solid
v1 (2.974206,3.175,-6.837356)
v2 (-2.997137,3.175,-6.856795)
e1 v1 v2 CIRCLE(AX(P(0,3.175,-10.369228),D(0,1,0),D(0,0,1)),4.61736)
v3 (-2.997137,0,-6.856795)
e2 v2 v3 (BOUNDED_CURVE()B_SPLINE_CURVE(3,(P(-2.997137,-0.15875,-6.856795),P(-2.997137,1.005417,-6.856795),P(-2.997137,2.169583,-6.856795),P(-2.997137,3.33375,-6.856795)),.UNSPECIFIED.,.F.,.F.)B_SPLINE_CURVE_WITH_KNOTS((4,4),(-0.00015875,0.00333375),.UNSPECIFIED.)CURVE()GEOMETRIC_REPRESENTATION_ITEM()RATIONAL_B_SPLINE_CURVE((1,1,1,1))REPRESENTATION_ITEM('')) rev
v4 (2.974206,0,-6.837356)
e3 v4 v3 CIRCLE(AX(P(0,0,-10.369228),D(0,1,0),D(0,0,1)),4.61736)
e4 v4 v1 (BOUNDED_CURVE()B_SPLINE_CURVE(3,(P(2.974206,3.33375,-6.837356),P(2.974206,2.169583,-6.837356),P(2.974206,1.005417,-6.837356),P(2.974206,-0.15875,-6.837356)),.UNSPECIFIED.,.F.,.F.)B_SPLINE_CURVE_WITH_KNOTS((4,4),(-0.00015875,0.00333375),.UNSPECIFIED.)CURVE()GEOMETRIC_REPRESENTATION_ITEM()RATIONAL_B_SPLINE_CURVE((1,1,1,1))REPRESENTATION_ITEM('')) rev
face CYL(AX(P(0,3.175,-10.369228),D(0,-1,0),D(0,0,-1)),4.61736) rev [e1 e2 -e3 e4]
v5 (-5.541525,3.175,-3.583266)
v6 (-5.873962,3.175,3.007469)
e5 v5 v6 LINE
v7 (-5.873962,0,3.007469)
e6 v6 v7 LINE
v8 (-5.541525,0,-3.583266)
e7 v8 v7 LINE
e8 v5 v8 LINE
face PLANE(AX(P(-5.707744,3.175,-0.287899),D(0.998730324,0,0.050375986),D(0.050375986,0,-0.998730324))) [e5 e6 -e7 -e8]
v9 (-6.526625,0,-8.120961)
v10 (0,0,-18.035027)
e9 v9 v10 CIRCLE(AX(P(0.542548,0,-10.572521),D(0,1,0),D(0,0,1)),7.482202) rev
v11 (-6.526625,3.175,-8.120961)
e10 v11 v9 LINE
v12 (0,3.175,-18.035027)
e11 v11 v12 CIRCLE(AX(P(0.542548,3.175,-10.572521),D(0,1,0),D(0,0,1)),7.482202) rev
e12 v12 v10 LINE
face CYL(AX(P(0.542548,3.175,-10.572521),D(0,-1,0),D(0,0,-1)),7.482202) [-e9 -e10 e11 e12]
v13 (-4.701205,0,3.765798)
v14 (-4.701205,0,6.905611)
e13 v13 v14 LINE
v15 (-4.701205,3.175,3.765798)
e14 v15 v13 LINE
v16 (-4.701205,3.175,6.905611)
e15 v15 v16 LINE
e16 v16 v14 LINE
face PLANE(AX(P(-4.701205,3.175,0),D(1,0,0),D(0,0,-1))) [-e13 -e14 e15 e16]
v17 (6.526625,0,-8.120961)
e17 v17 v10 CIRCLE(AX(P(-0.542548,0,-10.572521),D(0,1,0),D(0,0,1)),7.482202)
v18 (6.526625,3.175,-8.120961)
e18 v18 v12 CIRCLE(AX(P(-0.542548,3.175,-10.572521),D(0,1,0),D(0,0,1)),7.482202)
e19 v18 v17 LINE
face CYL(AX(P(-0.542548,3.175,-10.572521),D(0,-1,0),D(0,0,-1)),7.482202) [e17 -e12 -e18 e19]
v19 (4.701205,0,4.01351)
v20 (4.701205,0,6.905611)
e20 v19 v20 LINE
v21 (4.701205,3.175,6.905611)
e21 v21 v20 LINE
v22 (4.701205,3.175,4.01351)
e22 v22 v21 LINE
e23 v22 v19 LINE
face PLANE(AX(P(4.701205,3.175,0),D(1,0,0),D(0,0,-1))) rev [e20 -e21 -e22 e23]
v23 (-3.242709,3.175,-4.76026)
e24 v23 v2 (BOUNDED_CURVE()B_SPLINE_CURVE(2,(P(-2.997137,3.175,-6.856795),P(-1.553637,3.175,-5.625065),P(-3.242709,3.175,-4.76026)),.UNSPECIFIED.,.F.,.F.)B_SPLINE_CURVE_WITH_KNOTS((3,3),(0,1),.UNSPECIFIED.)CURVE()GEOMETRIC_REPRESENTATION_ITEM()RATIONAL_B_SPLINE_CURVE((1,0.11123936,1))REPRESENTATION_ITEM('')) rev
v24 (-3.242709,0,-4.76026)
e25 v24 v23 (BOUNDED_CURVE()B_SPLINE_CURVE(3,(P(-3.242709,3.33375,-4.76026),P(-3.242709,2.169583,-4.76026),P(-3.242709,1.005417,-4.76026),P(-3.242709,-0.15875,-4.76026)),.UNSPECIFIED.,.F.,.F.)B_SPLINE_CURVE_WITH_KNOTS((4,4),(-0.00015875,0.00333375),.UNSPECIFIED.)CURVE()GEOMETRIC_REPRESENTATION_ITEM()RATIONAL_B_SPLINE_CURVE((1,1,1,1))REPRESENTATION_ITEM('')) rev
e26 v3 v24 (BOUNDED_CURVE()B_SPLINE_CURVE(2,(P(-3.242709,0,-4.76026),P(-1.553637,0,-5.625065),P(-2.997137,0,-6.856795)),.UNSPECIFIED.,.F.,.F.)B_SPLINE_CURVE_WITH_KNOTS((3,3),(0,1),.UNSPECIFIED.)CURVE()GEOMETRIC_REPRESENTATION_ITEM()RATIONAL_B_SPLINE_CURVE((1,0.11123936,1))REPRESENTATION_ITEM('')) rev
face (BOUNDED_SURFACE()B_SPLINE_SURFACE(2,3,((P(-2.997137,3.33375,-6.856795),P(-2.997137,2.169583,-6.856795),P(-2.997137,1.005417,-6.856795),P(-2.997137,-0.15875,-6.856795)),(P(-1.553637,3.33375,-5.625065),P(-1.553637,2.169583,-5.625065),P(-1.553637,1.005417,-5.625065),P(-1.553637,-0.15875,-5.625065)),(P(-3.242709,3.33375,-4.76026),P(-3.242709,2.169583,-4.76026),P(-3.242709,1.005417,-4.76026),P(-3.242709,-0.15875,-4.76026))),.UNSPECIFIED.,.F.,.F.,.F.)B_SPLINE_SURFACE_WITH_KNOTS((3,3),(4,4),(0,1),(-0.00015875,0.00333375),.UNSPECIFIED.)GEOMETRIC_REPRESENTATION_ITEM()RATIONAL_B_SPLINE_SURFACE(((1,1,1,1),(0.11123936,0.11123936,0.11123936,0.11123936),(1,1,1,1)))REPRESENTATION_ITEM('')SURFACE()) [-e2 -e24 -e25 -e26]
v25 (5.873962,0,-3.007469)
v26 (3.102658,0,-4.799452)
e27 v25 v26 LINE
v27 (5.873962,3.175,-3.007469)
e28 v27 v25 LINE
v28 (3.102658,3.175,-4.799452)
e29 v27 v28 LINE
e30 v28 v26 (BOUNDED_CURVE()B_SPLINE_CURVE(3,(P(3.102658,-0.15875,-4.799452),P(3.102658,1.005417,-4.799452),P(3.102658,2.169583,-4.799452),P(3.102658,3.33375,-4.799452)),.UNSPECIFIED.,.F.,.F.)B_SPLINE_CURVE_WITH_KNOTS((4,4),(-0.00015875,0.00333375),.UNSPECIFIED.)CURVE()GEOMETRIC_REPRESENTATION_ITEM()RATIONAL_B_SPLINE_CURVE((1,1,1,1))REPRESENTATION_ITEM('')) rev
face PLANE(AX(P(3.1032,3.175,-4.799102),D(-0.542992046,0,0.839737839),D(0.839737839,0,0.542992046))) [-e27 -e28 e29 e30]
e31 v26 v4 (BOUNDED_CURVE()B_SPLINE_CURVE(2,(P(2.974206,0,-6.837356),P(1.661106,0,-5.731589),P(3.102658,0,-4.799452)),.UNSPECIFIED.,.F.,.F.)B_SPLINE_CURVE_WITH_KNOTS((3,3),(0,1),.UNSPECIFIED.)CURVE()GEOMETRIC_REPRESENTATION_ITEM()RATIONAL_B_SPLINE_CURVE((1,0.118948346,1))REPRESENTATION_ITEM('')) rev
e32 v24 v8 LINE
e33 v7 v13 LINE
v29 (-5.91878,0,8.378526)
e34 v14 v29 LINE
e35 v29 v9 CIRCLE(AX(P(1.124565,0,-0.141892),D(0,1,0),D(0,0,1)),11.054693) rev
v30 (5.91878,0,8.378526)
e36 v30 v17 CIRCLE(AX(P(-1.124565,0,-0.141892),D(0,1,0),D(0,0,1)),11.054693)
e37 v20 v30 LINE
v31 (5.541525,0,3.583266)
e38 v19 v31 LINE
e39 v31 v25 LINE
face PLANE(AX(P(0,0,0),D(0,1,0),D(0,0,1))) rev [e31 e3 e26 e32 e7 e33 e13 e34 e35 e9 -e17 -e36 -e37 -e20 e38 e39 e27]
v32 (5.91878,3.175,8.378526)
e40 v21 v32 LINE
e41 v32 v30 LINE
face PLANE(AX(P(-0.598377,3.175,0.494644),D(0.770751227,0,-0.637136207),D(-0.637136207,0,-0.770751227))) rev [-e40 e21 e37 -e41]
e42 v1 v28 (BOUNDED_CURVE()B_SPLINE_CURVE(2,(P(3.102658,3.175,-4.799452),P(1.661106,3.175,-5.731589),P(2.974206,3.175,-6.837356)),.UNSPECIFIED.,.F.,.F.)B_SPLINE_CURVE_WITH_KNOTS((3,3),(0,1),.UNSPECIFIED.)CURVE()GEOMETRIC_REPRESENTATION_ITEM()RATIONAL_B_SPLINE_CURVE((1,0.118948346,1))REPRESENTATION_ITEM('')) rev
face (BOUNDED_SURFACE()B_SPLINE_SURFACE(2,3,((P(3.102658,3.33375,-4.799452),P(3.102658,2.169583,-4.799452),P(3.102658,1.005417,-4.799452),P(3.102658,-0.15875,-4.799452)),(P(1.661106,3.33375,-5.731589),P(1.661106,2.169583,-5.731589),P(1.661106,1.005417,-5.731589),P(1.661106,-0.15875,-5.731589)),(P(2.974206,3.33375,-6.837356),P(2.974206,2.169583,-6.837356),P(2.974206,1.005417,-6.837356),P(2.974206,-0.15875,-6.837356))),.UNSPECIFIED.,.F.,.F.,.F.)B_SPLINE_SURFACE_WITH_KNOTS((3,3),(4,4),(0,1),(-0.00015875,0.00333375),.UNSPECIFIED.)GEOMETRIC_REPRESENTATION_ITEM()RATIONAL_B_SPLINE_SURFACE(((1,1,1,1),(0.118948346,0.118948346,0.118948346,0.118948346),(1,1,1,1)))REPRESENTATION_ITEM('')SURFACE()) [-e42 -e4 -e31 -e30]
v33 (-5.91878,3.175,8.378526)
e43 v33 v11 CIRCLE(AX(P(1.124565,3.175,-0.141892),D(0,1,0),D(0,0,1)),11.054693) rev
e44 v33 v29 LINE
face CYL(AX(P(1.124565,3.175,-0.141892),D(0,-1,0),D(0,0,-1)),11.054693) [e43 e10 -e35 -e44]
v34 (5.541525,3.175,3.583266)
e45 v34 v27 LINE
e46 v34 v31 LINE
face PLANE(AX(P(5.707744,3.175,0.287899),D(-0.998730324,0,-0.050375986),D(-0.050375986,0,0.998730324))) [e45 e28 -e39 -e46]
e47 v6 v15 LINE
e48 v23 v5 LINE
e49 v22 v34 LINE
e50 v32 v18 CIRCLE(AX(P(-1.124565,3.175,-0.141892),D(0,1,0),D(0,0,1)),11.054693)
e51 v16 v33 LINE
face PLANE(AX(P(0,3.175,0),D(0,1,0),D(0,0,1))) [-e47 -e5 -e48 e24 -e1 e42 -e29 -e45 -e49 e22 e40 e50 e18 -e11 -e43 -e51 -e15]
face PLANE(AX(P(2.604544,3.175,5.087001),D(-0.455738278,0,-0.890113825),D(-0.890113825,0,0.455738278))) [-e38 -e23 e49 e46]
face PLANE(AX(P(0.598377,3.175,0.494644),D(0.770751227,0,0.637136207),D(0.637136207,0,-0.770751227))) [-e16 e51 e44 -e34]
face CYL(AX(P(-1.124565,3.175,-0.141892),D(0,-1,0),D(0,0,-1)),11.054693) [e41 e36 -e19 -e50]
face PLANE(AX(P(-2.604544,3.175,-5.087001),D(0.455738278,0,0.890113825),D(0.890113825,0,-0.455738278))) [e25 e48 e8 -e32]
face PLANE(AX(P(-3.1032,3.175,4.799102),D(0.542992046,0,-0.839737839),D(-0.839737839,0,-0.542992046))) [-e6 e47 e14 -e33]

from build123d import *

# Parameters (mm, degrees)
BOSS_EXTRUDE1_DEPTH = 3.175


with BuildPart() as part:
    # Sketch3 → Boss-Extrude1 (new body)
    with BuildSketch(Plane(origin=(0, 0, 0), x_dir=(1, 0, 0), z_dir=(0, 1, 0))):
        with BuildLine():
            Line((-5.541525375, 3.58326618), (-2.47962532, 5.150959008))
            Line((-2.47962532, 5.150959008), (-2.47962532, 6.474170352))
            ThreePointArc((-2.47962532, 6.474170352), (-2.221563685, 14.417025562), (4.617359972, 10.369227654))
            ThreePointArc((4.617359972, 10.369227654), (4.047797908, 8.147663968), (2.47962532, 6.474170352))
            Line((2.47962532, 6.474170352), (2.47962532, 5.20231788))
            Line((2.47962532, 5.20231788), (5.873962228, 3.007468661))
            Line((5.873962228, 3.007468661), (5.541525375, -3.58326618))
            Line((5.541525375, -3.58326618), (4.701204968, -4.013510228))
            Line((4.701204968, -4.013510228), (4.701204968, -6.905610932))
            Line((4.701204968, -6.905610932), (5.918780254, -8.378526195))
            ThreePointArc((5.918780254, -8.378526195), (9.922634137, -0.265088751), (6.526624698, 8.120961152))
            ThreePointArc((6.526624698, 8.120961152), (5.706991897, 14.686716316), (0, 18.035026682))
            ThreePointArc((0, 18.035026682), (-5.706991897, 14.686716316), (-6.526624698, 8.120961152))
            ThreePointArc((-6.526624698, 8.120961152), (-9.922634137, -0.265088751), (-5.918780254, -8.378526195))
            Line((-5.918780254, -8.378526195), (-4.701204968, -6.905610932))
            Line((-4.701204968, -6.905610932), (-4.701204968, -3.765798027))
            Line((-4.701204968, -3.765798027), (-5.873962228, -3.007468661))
            Line((-5.873962228, -3.007468661), (-5.541525375, 3.58326618))
        make_face()
        with BuildLine():
            Line((-2.47962532, 6.474170352), (-2.47962532, 5.150959008))
            Line((-2.47962532, 5.150959008), (-1.063503338, 5.876013463))
            ThreePointArc((-1.063503338, 5.876013463), (-1.79663243, 6.115743784), (-2.47962532, 6.474170352))
        make_face()
        with BuildLine():
            ThreePointArc((2.47962532, 6.474170352), (1.921985685, 6.17089654), (1.328021538, 5.946968965))
            Line((1.328021538, 5.946968965), (2.47962532, 5.20231788))
            Line((2.47962532, 5.20231788), (2.47962532, 6.474170352))
        make_face()
    extrude(amount=BOSS_EXTRUDE1_DEPTH)

    # Fillet6
    # a fillet whose section is not a circle: 1.27 mm, written as the material it takes off along each edge
    with BuildSketch(Plane(origin=(1.328021538, -5.283304691, -5.946968965), x_dir=(0.8397378391322112, 0, 0.5429920455490709), z_dir=(0, 1, 0))) as fillet6_piece_1:
        with BuildLine():
            Bezier((2.113321876, 0), (0.3966534, 0), (0.898889741, 1.641556979), weights=[1, 0.118948346, 1])
            ThreePointArc((0.898889741, 1.641556979), (0.533488386, 0.774757636), (0, 0))
            Line((0, 0), (2.113321876, 0))
        make_face()
    extrude(amount=13.741609382, mode=Mode.SUBTRACT)
    with BuildSketch(Plane(origin=(-1.063503338, -6.120582224, -5.876013463), x_dir=(-0.891835980226881, 0, -0.4523589110128793), z_dir=(0, 1, 0))) as fillet6_piece_2:
        with BuildLine():
            Bezier((2.168149873, 0), (0.323600022, 0.445521101), (1.438773255, 1.980852292), weights=[1, 0.11123936, 1])
            Line((1.438773255, 1.980852292), (0, 0))
            ThreePointArc((0, 0), (1.084074937, 0.129064678), (2.168149873, 0))
        make_face()
    extrude(amount=15.416164449, mode=Mode.SUBTRACT)


solid = part.part
